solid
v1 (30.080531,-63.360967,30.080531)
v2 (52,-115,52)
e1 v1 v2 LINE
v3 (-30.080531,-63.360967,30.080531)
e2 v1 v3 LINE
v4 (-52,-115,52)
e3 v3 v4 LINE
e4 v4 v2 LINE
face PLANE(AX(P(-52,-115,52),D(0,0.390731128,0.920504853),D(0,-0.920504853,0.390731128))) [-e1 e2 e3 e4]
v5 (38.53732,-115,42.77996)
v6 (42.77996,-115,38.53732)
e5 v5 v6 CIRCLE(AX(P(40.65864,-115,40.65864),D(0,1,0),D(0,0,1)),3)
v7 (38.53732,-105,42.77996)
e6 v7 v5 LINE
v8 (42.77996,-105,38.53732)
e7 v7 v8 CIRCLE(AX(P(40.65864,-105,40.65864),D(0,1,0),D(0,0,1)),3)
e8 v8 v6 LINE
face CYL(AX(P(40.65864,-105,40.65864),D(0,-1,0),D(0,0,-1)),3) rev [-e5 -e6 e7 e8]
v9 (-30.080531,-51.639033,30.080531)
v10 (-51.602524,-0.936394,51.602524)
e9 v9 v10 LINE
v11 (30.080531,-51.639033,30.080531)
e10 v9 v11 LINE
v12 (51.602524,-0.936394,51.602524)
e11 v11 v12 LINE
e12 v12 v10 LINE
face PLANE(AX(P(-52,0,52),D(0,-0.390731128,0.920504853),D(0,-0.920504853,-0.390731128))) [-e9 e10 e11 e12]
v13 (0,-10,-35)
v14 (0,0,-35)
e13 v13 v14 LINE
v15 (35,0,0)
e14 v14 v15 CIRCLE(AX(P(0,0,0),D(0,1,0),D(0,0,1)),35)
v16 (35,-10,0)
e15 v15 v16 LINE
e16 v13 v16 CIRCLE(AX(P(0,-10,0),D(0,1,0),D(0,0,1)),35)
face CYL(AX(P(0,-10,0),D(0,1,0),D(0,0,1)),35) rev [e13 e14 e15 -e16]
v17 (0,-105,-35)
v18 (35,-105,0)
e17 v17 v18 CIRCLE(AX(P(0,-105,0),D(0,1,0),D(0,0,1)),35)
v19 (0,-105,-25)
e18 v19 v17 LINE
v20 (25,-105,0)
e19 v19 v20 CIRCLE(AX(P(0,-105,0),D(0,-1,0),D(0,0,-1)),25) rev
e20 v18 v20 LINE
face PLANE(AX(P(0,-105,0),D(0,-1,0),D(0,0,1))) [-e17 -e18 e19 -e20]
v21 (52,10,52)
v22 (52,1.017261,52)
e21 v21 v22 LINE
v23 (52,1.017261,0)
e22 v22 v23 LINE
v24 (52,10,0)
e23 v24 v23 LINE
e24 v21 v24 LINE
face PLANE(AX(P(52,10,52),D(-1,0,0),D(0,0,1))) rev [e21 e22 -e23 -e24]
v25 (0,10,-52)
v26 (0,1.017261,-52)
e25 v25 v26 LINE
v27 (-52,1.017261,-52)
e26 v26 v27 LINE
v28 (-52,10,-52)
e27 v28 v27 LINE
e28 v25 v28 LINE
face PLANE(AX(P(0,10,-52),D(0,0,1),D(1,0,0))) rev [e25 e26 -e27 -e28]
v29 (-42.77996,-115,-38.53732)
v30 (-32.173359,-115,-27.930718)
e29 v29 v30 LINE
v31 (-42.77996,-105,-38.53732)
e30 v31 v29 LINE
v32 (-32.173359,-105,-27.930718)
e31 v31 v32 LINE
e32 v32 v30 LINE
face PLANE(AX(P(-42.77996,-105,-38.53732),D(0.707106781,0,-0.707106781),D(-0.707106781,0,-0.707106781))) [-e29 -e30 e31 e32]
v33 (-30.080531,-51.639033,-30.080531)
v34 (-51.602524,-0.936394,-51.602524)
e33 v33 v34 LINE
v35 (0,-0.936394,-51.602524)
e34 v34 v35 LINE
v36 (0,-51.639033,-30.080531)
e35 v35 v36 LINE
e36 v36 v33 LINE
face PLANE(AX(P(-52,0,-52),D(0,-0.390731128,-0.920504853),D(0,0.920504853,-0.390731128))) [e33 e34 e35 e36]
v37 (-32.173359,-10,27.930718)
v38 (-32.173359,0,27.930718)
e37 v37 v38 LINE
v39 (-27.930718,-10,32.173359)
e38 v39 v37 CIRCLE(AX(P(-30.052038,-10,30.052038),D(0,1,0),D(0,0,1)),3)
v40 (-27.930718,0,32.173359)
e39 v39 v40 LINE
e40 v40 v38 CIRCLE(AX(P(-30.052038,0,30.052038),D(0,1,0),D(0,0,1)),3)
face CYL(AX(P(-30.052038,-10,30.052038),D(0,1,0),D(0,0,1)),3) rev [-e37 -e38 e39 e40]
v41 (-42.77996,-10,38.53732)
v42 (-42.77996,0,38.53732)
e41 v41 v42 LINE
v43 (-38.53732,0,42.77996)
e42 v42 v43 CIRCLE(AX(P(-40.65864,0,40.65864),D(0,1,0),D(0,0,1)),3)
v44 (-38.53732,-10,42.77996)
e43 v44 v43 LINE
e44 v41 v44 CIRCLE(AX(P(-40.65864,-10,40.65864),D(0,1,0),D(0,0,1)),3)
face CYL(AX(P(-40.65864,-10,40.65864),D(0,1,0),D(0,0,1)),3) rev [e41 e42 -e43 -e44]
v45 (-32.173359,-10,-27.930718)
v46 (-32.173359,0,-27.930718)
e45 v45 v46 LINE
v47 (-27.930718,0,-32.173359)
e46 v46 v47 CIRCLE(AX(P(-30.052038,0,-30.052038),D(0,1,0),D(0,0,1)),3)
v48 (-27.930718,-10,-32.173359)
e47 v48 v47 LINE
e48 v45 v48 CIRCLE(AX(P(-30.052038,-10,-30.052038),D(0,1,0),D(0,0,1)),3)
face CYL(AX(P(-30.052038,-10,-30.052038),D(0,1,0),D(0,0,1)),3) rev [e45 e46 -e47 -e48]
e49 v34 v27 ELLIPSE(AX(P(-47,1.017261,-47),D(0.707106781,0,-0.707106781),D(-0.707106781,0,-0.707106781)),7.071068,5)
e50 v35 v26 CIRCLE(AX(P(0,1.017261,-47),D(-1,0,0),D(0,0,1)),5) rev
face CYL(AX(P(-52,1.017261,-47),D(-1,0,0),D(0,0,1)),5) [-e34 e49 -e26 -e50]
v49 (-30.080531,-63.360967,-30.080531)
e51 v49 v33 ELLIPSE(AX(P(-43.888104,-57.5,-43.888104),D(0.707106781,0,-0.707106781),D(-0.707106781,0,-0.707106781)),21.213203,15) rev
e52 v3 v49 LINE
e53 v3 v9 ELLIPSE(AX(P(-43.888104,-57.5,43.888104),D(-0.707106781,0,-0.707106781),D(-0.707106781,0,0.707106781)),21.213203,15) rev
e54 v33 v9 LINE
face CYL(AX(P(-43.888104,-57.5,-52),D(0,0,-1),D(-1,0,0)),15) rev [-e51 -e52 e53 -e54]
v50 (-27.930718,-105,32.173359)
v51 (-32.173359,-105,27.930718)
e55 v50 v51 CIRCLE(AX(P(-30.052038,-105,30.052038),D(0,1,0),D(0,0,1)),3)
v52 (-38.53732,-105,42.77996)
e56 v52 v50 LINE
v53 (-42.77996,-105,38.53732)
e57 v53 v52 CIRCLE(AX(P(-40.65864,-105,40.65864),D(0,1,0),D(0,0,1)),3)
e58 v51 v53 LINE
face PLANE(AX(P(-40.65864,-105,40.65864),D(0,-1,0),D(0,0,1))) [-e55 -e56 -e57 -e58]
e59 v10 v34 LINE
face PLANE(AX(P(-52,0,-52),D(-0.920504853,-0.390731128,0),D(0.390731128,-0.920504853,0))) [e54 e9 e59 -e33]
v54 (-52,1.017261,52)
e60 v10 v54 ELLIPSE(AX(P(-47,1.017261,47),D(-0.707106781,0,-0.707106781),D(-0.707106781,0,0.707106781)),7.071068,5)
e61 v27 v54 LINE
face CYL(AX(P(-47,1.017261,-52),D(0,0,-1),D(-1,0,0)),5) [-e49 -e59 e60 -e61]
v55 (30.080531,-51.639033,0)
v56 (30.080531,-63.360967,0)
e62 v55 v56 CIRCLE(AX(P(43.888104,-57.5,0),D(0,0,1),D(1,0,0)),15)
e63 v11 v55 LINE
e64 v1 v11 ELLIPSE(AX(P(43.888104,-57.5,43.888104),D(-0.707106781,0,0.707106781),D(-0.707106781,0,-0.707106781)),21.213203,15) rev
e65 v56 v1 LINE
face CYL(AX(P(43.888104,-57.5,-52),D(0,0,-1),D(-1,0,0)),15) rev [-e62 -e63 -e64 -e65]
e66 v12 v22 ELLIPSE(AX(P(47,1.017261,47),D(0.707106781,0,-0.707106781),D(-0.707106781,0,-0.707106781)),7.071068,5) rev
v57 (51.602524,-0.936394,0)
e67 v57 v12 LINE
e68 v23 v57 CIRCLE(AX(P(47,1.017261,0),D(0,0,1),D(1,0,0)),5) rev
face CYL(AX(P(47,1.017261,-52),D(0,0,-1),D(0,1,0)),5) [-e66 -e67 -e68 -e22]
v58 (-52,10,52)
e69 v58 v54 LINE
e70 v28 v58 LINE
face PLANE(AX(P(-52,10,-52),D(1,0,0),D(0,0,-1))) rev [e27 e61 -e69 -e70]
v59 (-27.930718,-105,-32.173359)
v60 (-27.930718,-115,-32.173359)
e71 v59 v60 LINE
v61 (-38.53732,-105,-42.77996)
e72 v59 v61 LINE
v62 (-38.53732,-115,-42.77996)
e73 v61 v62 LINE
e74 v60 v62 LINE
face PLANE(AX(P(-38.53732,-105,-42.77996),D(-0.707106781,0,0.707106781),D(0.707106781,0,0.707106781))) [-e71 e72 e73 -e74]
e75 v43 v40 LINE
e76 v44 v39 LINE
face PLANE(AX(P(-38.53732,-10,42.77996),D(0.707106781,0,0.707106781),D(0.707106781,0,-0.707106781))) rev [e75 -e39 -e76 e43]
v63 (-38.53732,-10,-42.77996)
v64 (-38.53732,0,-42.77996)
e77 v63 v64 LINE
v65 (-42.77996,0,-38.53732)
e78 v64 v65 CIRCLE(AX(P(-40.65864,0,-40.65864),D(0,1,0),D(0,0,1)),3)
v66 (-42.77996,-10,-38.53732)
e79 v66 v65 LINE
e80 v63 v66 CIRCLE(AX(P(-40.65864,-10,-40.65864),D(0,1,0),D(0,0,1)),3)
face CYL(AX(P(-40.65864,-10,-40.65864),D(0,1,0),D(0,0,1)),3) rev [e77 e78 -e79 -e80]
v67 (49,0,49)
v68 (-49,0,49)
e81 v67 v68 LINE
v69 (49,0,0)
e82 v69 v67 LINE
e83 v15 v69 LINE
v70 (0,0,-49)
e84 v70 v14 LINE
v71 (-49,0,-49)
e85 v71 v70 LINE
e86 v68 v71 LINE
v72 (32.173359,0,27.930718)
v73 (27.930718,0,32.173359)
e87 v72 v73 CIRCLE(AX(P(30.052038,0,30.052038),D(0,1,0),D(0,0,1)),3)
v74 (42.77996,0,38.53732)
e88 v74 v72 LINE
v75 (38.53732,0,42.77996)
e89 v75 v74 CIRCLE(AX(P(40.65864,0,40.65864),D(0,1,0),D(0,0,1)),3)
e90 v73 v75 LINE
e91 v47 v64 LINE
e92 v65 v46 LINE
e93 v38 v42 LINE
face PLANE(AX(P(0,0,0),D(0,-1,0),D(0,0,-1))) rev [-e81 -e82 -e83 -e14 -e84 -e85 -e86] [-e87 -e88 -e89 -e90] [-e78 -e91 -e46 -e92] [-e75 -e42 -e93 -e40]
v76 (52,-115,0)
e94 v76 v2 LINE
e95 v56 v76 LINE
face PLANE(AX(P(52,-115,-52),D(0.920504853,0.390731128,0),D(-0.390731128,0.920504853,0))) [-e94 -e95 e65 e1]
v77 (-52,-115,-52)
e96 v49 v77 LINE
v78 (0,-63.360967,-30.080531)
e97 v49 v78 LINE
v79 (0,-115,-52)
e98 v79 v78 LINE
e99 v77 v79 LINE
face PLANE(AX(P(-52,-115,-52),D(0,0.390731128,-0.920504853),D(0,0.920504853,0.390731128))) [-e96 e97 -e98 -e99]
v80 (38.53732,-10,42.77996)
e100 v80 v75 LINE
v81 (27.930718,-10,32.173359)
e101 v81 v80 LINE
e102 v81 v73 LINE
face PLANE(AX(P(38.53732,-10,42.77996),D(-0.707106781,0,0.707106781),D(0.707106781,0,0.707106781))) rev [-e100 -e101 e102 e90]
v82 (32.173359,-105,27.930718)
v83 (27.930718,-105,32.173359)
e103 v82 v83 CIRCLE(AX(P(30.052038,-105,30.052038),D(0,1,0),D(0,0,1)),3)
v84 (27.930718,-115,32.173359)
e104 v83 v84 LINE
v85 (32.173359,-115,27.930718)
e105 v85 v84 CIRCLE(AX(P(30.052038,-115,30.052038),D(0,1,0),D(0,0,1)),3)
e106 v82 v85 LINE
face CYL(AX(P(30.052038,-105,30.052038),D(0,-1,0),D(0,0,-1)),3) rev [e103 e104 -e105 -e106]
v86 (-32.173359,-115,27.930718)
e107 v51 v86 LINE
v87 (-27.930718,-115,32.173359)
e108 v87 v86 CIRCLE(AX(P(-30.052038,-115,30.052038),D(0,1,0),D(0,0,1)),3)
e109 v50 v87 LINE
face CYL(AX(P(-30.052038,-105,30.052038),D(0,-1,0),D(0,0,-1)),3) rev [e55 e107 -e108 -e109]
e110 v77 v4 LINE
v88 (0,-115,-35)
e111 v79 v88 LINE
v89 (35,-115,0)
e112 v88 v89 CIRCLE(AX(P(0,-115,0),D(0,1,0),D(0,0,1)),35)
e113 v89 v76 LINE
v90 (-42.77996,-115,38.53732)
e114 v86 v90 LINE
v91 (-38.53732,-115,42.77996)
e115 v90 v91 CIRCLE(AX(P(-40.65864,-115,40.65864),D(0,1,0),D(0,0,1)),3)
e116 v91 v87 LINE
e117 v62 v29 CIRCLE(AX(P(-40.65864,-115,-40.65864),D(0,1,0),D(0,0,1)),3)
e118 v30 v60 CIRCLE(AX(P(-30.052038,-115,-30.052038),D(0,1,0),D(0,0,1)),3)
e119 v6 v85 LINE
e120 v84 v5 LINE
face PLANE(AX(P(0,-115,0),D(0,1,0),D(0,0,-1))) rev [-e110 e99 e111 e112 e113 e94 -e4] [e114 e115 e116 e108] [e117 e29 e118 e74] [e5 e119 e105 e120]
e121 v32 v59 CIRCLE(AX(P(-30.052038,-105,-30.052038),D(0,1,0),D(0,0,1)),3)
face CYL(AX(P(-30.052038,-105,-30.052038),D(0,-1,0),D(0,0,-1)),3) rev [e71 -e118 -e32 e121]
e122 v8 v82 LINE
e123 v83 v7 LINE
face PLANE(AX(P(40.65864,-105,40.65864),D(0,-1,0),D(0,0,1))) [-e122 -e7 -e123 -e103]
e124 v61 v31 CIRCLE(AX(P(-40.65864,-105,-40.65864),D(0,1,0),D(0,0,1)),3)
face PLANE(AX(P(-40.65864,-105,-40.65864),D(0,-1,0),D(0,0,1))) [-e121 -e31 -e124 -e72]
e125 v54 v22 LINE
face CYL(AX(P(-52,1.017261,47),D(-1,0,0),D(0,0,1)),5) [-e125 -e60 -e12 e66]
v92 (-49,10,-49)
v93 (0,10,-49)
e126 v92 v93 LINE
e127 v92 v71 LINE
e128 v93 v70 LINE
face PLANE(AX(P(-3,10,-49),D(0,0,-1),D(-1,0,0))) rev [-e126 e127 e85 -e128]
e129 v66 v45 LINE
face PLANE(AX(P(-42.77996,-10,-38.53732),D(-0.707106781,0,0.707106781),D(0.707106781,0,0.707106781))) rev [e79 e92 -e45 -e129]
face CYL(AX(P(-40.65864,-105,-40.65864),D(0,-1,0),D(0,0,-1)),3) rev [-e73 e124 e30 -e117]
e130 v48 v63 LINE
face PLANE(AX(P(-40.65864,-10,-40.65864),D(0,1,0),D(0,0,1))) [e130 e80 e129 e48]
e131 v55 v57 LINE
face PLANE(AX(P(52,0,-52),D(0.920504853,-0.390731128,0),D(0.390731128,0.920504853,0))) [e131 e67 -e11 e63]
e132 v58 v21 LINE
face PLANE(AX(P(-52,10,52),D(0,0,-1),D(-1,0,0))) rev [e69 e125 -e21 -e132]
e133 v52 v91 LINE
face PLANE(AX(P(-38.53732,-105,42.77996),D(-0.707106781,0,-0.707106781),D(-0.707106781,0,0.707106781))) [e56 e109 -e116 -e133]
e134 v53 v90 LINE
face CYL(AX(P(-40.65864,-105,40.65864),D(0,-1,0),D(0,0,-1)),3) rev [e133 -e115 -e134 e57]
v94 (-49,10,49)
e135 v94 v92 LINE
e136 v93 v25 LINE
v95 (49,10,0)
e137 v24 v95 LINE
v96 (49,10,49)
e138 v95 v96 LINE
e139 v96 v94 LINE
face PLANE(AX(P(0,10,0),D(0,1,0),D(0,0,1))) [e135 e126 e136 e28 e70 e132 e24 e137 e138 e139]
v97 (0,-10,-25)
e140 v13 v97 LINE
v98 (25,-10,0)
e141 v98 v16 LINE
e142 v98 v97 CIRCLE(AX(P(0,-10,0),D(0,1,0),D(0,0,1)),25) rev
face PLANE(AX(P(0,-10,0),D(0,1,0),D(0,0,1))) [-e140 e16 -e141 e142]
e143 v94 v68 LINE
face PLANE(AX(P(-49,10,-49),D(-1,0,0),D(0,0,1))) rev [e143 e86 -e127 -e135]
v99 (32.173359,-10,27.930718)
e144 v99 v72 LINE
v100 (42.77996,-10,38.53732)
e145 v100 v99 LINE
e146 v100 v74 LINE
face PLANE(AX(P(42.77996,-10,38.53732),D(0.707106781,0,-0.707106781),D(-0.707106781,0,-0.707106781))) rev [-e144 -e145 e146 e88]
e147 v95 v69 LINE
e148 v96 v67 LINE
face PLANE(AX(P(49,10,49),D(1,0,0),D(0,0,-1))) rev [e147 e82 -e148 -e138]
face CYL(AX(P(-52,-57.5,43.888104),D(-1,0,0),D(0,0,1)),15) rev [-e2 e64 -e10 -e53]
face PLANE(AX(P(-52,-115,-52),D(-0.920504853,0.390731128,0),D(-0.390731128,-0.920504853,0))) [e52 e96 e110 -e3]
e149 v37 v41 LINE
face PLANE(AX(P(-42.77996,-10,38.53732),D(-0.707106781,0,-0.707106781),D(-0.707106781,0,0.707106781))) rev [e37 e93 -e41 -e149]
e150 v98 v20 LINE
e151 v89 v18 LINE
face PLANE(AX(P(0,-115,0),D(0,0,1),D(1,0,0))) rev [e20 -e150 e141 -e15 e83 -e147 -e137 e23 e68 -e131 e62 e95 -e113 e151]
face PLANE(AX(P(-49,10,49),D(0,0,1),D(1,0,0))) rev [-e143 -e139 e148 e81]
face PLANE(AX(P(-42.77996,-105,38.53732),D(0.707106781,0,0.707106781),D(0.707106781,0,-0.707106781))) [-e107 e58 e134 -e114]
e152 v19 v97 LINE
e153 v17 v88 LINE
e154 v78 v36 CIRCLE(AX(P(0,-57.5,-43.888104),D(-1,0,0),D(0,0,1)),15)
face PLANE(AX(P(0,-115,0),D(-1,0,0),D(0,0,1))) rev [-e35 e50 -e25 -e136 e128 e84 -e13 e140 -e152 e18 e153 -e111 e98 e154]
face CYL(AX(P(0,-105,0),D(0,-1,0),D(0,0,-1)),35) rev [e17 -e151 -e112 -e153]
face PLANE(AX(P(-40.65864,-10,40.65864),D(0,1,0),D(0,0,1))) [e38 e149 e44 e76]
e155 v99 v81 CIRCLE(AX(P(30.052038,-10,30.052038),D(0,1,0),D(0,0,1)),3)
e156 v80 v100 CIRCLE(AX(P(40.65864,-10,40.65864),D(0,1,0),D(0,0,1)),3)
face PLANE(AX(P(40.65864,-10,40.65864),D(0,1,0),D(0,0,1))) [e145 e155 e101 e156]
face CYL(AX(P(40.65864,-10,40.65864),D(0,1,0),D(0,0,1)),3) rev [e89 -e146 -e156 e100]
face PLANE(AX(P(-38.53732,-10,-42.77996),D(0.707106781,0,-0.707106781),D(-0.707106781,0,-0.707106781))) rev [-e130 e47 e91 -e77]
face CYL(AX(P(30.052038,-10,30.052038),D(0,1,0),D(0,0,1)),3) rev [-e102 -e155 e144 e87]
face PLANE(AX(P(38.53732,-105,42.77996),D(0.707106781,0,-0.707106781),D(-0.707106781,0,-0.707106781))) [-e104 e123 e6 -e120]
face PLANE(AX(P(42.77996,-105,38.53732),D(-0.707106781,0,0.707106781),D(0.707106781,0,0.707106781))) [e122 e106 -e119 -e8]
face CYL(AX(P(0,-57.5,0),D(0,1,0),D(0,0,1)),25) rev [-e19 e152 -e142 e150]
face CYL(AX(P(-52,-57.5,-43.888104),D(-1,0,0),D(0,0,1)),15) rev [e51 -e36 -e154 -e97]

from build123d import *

# Parameters (mm, degrees)
SKETCH1_W           = 104
SKETCH1_H           = 104
BOSS_EXTRUDE1_DEPTH = 57.5
BOSS_EXTRUDE1_DRAFT = -23
SKETCH1_3_R         = 25
CUT_EXTRUDE1_DEPTH  = 94.350147295
SKETCH3_R           = 35
CUT_EXTRUDE2_DEPTH  = 10
SKETCH4_W           = 95.556530254
SKETCH4_H           = 88.466852203
CUT_EXTRUDE3_DEPTH  = 137.502747225
FILLET1_R           = 15
BOSS_EXTRUDE2_DEPTH = 10
FILLET2_R           = 5
CUT_EXTRUDE4_DEPTH  = 10


# Read off the part's stored shape, not the designer's step: Mirror2
with BuildPart() as part:
    # Sketch1 → Boss-Extrude1 (with draft: the straight prism first)
    with BuildSketch(Plane(origin=(0, 0, 0), x_dir=(1, 0, 0), z_dir=(0, 1, 0))):
        Rectangle(SKETCH1_W, SKETCH1_H)
    extrude(amount=-BOSS_EXTRUDE1_DEPTH)
    # Boss-Extrude1: the draft: its side faces are tilted about the plane it starts from
    boss_extrude1_sides = [part.faces().sort_by_distance(p)[0] for p in [
        (-52, -28.75, 0),
        (0, -28.75, 52),
        (52, -28.75, 0),
        (0, -28.75, -52),
    ]]
    draft(boss_extrude1_sides, Plane(origin=(0, 0, 0), x_dir=(1, 0, 0), z_dir=(0, 1, 0)), BOSS_EXTRUDE1_DRAFT)

    # Sketch1<3> → Cut-Extrude1 (cut, through all)
    with BuildSketch(Plane(origin=(0, 0, 0), x_dir=(1, 0, 0), z_dir=(0, 1, 0))):
        with Locations(Location((0, 0, 0), (0, 0, 270))):
            Circle(SKETCH1_3_R)
    extrude(amount=-CUT_EXTRUDE1_DEPTH, mode=Mode.SUBTRACT)

    # Sketch3 → Cut-Extrude2 (cut)
    with BuildSketch(Plane(origin=(0, 0, 0), x_dir=(1, 0, 0), z_dir=(0, 1, 0))):
        with Locations(Location((0, 0, 0), (0, 0, 270))):
            Circle(SKETCH3_R)
    extrude(amount=-CUT_EXTRUDE2_DEPTH, mode=Mode.SUBTRACT)

    # Mirror2: part across plane


with BuildPart() as part_1:
    add(part.part)
    add(part.part.mirror(Plane.ZX.offset(-57.5)))

    # Sketch4 → Cut-Extrude3 (cut, through all)
    with BuildSketch(Plane(origin=(0, 0, 0), x_dir=(1, 0, 0), z_dir=(0, 1, 0))):
        with Locations((47.778265127, 44.233426102)):
            Rectangle(SKETCH4_W, SKETCH4_H)
    extrude(amount=-CUT_EXTRUDE3_DEPTH, mode=Mode.SUBTRACT)

    # Fillet1
    fillet1_edges = [part_1.edges().sort_by_distance(p)[0] for p in [
        (-13.796349034, -57.5, -27.592698068),
        (-27.592698068, -57.5, 0),
        (0, -57.5, 27.592698068),
        (27.592698068, -57.5, 13.796349034),
    ]]
    fillet(fillet1_edges, radius=FILLET1_R)

    # Sketch5 → Boss-Extrude2 (add)
    with BuildSketch(Plane(origin=(0, 0, 0), x_dir=(1, 0, 0), z_dir=(0, 1, 0))):
        Polygon((-49, 49), (-49, -49), (49, -49), (49, -3), (49, 0), (52, 0), (52, -52), (-52, -52), (-52, 52), (0, 52), (0, 49), (-3, 49), align=None)
    extrude(amount=BOSS_EXTRUDE2_DEPTH)

    # Fillet2
    fillet2_edges = [part_1.edges().sort_by_distance(p)[0] for p in [
        (-52, 0, 0),
        (-26, 0, -52),
        (52, 0, 26),
        (0, 0, 52),
    ]]
    fillet(fillet2_edges, radius=FILLET2_R)

    # Sketch6 → Cut-Extrude4 (cut)
    with BuildSketch(Plane(origin=(0, 0, 0), x_dir=(1, 0, 0), z_dir=(0, 1, 0))):
        with BuildLine():
            Line((-42.779960262, -38.537319575), (-32.173358544, -27.930717857))
            ThreePointArc((-32.173358544, -27.930717857), (-27.930717857, -27.930717857), (-27.930717857, -32.173358544))
            Line((-27.930717857, -32.173358544), (-38.537319575, -42.779960262))
            ThreePointArc((-38.537319575, -42.779960262), (-42.779960262, -42.779960262), (-42.779960262, -38.537319575))
        make_face()
        with BuildLine():
            Line((-38.537319575, 42.779960262), (-27.930717857, 32.173358544))
            ThreePointArc((-27.930717857, 32.173358544), (-27.930717857, 27.930717857), (-32.173358544, 27.930717857))
            Line((-32.173358544, 27.930717857), (-42.779960262, 38.537319575))
            ThreePointArc((-42.779960262, 38.537319575), (-42.779960262, 42.779960262), (-38.537319575, 42.779960262))
        make_face()
        with BuildLine():
            Line((38.537319575, -42.779960262), (27.930717857, -32.173358544))
            ThreePointArc((27.930717857, -32.173358544), (27.930717857, -27.930717857), (32.173358544, -27.930717857))
            Line((32.173358544, -27.930717857), (42.779960262, -38.537319575))
            ThreePointArc((42.779960262, -38.537319575), (42.779960262, -42.779960262), (38.537319575, -42.779960262))
        make_face()
    cut_extrude4 = extrude(amount=-CUT_EXTRUDE4_DEPTH, mode=Mode.SUBTRACT)

    # Mirror3: Cut-Extrude4 across plane
    add(cut_extrude4.mirror(Plane.ZX.offset(-57.5)), mode=Mode.SUBTRACT)


solid = part_1.part
